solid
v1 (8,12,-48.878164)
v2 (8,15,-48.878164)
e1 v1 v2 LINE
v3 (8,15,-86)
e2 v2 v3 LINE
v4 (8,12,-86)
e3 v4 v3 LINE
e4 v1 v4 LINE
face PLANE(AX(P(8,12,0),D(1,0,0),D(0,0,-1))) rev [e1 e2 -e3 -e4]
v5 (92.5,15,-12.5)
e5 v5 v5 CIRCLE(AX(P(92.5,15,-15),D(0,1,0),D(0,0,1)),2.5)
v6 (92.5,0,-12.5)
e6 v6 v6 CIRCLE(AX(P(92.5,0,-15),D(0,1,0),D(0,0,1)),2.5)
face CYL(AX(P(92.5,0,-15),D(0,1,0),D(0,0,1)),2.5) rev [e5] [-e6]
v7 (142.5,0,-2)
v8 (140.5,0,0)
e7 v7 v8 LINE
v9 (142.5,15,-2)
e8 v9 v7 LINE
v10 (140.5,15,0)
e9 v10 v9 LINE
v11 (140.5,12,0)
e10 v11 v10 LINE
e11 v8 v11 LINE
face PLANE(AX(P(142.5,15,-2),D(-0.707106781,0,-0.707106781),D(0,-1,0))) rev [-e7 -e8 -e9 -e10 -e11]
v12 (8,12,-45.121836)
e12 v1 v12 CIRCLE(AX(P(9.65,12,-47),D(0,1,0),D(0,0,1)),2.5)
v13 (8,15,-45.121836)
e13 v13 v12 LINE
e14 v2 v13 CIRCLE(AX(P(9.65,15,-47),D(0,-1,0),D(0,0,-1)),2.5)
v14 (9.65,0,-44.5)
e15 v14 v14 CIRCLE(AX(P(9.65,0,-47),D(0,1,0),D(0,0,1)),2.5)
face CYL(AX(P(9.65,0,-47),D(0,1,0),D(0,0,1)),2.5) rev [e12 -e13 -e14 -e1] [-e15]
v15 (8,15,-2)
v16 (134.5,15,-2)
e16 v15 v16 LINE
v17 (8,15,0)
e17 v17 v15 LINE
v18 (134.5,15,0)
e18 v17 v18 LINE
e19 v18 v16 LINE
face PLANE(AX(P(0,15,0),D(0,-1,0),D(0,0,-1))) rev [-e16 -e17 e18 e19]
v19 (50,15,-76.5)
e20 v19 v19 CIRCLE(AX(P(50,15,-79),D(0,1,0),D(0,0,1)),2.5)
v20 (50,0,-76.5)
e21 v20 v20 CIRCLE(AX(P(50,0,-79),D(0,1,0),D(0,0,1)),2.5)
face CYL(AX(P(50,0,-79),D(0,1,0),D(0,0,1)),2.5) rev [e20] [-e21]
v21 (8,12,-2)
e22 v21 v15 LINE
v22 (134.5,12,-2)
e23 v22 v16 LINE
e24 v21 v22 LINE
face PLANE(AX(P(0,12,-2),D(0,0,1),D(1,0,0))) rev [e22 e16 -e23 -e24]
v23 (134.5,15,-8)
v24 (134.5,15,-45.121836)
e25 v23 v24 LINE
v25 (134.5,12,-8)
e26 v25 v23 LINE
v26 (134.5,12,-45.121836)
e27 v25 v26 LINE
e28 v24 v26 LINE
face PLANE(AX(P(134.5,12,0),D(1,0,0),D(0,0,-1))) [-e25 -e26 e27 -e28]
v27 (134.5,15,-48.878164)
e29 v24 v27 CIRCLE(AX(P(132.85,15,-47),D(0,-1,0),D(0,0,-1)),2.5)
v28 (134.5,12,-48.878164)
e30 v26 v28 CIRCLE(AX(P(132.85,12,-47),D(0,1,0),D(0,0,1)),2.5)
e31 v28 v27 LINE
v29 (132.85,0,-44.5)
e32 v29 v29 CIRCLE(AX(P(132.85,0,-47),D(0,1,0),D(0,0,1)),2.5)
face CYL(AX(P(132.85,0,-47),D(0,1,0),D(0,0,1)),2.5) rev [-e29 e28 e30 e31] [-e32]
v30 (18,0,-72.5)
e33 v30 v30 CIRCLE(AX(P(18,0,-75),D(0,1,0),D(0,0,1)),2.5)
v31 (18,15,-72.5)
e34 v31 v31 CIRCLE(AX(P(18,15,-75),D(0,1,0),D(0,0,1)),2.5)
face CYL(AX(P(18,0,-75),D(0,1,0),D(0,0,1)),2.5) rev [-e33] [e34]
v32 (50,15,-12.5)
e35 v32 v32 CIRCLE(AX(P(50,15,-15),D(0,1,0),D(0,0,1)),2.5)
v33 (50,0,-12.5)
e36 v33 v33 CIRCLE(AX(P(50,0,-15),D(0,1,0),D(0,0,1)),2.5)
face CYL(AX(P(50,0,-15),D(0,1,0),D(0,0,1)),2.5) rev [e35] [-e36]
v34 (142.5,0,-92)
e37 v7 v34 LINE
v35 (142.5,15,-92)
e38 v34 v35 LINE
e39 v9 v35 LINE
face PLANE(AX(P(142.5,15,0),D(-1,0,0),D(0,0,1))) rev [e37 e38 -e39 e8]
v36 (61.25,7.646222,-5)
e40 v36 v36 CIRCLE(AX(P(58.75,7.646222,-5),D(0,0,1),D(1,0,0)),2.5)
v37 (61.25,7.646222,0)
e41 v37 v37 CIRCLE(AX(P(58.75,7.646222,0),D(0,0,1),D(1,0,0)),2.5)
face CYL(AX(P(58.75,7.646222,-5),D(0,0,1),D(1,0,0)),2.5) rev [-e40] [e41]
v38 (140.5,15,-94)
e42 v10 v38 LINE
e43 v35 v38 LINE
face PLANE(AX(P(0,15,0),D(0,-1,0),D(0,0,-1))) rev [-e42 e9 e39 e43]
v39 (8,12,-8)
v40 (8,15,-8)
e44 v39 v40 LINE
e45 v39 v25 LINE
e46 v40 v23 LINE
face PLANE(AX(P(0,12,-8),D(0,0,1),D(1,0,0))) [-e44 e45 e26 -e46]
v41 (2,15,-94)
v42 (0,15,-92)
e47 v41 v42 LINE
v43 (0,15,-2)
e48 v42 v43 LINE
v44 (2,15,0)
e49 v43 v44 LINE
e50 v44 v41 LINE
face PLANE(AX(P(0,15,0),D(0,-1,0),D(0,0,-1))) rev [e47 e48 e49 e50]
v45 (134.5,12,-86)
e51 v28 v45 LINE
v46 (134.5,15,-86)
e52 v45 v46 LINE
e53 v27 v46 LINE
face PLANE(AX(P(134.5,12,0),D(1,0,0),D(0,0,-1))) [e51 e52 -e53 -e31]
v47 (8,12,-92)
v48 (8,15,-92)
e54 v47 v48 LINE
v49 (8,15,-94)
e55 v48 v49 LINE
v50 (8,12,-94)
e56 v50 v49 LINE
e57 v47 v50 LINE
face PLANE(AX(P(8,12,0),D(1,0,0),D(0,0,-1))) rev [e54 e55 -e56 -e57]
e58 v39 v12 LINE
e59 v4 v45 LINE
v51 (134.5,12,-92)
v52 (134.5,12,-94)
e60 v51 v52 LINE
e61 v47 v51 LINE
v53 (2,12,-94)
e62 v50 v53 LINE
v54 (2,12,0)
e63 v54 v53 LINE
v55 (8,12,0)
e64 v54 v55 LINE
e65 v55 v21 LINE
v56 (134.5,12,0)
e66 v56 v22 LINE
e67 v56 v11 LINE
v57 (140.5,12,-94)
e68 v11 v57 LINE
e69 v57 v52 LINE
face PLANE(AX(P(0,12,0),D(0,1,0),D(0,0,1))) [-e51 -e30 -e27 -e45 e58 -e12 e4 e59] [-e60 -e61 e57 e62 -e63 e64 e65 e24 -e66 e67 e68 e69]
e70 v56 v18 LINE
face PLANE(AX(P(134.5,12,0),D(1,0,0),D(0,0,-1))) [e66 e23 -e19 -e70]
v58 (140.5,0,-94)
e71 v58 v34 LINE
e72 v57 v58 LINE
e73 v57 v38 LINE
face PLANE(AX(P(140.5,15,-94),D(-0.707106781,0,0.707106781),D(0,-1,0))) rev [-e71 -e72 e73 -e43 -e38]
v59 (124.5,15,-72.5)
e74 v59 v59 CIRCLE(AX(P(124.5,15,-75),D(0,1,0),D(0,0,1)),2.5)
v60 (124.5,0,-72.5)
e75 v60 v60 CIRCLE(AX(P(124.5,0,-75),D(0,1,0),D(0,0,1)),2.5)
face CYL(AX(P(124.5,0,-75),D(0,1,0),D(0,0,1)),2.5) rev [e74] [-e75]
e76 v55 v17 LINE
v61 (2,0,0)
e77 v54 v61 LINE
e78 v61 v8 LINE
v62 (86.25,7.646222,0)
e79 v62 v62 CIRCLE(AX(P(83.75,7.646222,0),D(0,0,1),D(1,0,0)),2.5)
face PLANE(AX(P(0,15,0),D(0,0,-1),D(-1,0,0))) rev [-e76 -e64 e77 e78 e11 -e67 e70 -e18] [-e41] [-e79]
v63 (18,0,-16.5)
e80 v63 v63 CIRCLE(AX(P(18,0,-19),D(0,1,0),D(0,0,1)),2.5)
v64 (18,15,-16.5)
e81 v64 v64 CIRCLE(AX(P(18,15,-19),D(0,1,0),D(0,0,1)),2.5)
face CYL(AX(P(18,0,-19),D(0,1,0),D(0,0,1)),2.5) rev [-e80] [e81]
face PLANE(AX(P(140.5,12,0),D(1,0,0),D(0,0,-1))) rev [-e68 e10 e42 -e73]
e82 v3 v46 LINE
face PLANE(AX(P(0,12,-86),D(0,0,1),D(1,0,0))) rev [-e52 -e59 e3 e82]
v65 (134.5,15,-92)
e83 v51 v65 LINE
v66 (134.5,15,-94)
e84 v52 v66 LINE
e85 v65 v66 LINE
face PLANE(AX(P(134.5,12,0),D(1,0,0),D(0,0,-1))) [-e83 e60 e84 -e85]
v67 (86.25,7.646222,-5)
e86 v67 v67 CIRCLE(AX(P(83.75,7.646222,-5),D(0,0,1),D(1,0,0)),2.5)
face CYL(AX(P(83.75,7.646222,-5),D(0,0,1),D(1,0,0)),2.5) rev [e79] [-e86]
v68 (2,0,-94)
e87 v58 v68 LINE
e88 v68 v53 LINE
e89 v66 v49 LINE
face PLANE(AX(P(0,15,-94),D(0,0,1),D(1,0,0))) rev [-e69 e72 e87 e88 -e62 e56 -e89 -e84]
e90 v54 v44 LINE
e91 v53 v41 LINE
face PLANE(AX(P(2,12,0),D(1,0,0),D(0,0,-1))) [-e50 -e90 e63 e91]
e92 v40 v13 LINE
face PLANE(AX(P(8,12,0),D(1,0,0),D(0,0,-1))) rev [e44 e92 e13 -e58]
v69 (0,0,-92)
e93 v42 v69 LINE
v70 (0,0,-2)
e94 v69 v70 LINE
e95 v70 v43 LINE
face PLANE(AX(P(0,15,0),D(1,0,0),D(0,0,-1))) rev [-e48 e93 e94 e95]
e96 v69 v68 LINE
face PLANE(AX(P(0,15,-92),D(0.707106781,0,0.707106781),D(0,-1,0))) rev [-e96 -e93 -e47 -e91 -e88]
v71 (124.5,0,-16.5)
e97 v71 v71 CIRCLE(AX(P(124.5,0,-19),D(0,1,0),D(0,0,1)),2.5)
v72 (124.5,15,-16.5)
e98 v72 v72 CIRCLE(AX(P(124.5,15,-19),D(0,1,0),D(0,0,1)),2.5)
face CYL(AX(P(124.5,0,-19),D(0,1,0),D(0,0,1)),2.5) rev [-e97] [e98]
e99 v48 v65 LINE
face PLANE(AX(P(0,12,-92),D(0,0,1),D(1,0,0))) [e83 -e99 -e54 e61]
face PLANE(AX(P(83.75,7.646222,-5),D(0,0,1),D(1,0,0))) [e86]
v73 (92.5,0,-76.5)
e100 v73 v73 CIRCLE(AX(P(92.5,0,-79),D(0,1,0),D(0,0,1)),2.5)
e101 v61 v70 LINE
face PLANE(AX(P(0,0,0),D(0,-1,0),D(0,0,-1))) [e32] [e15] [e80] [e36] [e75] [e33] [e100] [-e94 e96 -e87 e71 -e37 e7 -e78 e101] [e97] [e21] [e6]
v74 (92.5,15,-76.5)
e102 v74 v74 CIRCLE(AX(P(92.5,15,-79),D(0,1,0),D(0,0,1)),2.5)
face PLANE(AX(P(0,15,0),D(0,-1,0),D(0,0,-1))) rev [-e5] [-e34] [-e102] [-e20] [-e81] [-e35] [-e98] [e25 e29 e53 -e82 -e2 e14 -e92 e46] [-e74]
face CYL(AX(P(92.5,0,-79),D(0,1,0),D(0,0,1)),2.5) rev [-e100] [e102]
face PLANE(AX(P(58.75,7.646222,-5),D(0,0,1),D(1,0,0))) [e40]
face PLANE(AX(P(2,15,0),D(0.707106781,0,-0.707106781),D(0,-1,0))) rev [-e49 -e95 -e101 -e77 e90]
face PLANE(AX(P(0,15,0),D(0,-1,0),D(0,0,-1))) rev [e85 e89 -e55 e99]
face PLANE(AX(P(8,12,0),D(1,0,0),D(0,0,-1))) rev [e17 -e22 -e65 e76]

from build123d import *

# Parameters (mm, degrees)
SKETCH1_W           = 142.5
SKETCH1_H           = 94
BOSS_EXTRUDE1_DEPTH = 15
SKETCH2_W           = 126.5
SKETCH2_H           = 78
CUT_EXTRUDE2_DEPTH  = 3
SKETCH3_R           = 2.5
CUT_EXTRUDE3_DEPTH  = 172.368754445
CHAMFER1_SIZE       = 2
SKETCH4_R           = 2.5
CUT_EXTRUDE6_DEPTH  = 172.368754445
SKETCH6_R           = 2.5
CUT_EXTRUDE7_DEPTH  = 172.368754445
SKETCH7_R           = 2.5
CUT_EXTRUDE8_DEPTH  = 5


with BuildPart() as part:
    # Sketch1 → Boss-Extrude1 (new body)
    with BuildSketch(Plane(origin=(0, 0, 0), x_dir=(1, 0, 0), z_dir=(0, 1, 0))):
        with Locations((71.25, 47)):
            Rectangle(SKETCH1_W, SKETCH1_H)
    extrude(amount=BOSS_EXTRUDE1_DEPTH)

    # Sketch2 → Cut-Extrude2 (cut)
    with BuildSketch(Plane(origin=(0, 15, 0), x_dir=(1, 0, 0), z_dir=(0, 1, 0))):
        Polygon((134.5, 92), (8, 92), (8, 94), (2, 94), (2, 0), (8, 0), (8, 2), (134.5, 2), (134.5, 0), (140.5, 0), (140.5, 94), (134.5, 94), align=None)
        with Locations((71.25, 47)):
            Rectangle(SKETCH2_W, SKETCH2_H, mode=Mode.SUBTRACT)
    extrude(amount=-CUT_EXTRUDE2_DEPTH, mode=Mode.SUBTRACT)

    # Sketch3 → Cut-Extrude3 (cut, through all)
    with BuildSketch(Plane(origin=(0, 15, 0), x_dir=(1, 0, 0), z_dir=(0, 1, 0))):
        with Locations(Location((9.65, 47, 0), (0, 0, 270))):
            Circle(SKETCH3_R)
        with Locations(Location((132.85, 47, 0), (0, 0, 270))):
            Circle(SKETCH3_R)
    extrude(amount=-CUT_EXTRUDE3_DEPTH, mode=Mode.SUBTRACT)

    # Chamfer1
    chamfer1_edges = [part.edges().sort_by_distance(p)[0] for p in [
        (0, 7.5, 0),
        (0, 7.5, -94),
        (142.5, 7.5, -94),
        (142.5, 7.5, 0),
    ]]
    chamfer(chamfer1_edges, length=CHAMFER1_SIZE - 0.0001)  # a hair under: the kernel refuses the full size

    # Sketch4 → Cut-Extrude6 (cut, through all)
    with BuildSketch(Plane(origin=(0, 15, 0), x_dir=(1, 0, 0), z_dir=(0, 1, 0))):
        with Locations(Location((50, 79, 0), (0, 0, 270))):
            Circle(SKETCH4_R)
        with Locations(Location((92.5, 79, 0), (0, 0, 270))):
            Circle(SKETCH4_R)
        with Locations(Location((50, 15, 0), (0, 0, 270))):
            Circle(SKETCH4_R)
        with Locations(Location((92.5, 15, 0), (0, 0, 270))):
            Circle(SKETCH4_R)
    extrude(amount=-CUT_EXTRUDE6_DEPTH, mode=Mode.SUBTRACT)

    # Sketch6 → Cut-Extrude7 (cut, through all)
    with BuildSketch(Plane(origin=(0, 15, 0), x_dir=(1, 0, 0), z_dir=(0, 1, 0))):
        with Locations(Location((124.5, 75, 0), (0, 0, 270))):
            Circle(SKETCH6_R)
        with Locations(Location((18, 75, 0), (0, 0, 270))):
            Circle(SKETCH6_R)
        with Locations(Location((18, 19, 0), (0, 0, 270))):
            Circle(SKETCH6_R)
        with Locations(Location((124.5, 19, 0), (0, 0, 270))):
            Circle(SKETCH6_R)
    extrude(amount=-CUT_EXTRUDE7_DEPTH, mode=Mode.SUBTRACT)

    # Sketch7 → Cut-Extrude8 (cut)
    with BuildSketch(Plane.XY):
        with Locations((58.75, 7.646221832)):
            Circle(SKETCH7_R)
        with Locations((83.75, 7.646221832)):
            Circle(SKETCH7_R)
    extrude(amount=-CUT_EXTRUDE8_DEPTH, mode=Mode.SUBTRACT)


solid = part.part
